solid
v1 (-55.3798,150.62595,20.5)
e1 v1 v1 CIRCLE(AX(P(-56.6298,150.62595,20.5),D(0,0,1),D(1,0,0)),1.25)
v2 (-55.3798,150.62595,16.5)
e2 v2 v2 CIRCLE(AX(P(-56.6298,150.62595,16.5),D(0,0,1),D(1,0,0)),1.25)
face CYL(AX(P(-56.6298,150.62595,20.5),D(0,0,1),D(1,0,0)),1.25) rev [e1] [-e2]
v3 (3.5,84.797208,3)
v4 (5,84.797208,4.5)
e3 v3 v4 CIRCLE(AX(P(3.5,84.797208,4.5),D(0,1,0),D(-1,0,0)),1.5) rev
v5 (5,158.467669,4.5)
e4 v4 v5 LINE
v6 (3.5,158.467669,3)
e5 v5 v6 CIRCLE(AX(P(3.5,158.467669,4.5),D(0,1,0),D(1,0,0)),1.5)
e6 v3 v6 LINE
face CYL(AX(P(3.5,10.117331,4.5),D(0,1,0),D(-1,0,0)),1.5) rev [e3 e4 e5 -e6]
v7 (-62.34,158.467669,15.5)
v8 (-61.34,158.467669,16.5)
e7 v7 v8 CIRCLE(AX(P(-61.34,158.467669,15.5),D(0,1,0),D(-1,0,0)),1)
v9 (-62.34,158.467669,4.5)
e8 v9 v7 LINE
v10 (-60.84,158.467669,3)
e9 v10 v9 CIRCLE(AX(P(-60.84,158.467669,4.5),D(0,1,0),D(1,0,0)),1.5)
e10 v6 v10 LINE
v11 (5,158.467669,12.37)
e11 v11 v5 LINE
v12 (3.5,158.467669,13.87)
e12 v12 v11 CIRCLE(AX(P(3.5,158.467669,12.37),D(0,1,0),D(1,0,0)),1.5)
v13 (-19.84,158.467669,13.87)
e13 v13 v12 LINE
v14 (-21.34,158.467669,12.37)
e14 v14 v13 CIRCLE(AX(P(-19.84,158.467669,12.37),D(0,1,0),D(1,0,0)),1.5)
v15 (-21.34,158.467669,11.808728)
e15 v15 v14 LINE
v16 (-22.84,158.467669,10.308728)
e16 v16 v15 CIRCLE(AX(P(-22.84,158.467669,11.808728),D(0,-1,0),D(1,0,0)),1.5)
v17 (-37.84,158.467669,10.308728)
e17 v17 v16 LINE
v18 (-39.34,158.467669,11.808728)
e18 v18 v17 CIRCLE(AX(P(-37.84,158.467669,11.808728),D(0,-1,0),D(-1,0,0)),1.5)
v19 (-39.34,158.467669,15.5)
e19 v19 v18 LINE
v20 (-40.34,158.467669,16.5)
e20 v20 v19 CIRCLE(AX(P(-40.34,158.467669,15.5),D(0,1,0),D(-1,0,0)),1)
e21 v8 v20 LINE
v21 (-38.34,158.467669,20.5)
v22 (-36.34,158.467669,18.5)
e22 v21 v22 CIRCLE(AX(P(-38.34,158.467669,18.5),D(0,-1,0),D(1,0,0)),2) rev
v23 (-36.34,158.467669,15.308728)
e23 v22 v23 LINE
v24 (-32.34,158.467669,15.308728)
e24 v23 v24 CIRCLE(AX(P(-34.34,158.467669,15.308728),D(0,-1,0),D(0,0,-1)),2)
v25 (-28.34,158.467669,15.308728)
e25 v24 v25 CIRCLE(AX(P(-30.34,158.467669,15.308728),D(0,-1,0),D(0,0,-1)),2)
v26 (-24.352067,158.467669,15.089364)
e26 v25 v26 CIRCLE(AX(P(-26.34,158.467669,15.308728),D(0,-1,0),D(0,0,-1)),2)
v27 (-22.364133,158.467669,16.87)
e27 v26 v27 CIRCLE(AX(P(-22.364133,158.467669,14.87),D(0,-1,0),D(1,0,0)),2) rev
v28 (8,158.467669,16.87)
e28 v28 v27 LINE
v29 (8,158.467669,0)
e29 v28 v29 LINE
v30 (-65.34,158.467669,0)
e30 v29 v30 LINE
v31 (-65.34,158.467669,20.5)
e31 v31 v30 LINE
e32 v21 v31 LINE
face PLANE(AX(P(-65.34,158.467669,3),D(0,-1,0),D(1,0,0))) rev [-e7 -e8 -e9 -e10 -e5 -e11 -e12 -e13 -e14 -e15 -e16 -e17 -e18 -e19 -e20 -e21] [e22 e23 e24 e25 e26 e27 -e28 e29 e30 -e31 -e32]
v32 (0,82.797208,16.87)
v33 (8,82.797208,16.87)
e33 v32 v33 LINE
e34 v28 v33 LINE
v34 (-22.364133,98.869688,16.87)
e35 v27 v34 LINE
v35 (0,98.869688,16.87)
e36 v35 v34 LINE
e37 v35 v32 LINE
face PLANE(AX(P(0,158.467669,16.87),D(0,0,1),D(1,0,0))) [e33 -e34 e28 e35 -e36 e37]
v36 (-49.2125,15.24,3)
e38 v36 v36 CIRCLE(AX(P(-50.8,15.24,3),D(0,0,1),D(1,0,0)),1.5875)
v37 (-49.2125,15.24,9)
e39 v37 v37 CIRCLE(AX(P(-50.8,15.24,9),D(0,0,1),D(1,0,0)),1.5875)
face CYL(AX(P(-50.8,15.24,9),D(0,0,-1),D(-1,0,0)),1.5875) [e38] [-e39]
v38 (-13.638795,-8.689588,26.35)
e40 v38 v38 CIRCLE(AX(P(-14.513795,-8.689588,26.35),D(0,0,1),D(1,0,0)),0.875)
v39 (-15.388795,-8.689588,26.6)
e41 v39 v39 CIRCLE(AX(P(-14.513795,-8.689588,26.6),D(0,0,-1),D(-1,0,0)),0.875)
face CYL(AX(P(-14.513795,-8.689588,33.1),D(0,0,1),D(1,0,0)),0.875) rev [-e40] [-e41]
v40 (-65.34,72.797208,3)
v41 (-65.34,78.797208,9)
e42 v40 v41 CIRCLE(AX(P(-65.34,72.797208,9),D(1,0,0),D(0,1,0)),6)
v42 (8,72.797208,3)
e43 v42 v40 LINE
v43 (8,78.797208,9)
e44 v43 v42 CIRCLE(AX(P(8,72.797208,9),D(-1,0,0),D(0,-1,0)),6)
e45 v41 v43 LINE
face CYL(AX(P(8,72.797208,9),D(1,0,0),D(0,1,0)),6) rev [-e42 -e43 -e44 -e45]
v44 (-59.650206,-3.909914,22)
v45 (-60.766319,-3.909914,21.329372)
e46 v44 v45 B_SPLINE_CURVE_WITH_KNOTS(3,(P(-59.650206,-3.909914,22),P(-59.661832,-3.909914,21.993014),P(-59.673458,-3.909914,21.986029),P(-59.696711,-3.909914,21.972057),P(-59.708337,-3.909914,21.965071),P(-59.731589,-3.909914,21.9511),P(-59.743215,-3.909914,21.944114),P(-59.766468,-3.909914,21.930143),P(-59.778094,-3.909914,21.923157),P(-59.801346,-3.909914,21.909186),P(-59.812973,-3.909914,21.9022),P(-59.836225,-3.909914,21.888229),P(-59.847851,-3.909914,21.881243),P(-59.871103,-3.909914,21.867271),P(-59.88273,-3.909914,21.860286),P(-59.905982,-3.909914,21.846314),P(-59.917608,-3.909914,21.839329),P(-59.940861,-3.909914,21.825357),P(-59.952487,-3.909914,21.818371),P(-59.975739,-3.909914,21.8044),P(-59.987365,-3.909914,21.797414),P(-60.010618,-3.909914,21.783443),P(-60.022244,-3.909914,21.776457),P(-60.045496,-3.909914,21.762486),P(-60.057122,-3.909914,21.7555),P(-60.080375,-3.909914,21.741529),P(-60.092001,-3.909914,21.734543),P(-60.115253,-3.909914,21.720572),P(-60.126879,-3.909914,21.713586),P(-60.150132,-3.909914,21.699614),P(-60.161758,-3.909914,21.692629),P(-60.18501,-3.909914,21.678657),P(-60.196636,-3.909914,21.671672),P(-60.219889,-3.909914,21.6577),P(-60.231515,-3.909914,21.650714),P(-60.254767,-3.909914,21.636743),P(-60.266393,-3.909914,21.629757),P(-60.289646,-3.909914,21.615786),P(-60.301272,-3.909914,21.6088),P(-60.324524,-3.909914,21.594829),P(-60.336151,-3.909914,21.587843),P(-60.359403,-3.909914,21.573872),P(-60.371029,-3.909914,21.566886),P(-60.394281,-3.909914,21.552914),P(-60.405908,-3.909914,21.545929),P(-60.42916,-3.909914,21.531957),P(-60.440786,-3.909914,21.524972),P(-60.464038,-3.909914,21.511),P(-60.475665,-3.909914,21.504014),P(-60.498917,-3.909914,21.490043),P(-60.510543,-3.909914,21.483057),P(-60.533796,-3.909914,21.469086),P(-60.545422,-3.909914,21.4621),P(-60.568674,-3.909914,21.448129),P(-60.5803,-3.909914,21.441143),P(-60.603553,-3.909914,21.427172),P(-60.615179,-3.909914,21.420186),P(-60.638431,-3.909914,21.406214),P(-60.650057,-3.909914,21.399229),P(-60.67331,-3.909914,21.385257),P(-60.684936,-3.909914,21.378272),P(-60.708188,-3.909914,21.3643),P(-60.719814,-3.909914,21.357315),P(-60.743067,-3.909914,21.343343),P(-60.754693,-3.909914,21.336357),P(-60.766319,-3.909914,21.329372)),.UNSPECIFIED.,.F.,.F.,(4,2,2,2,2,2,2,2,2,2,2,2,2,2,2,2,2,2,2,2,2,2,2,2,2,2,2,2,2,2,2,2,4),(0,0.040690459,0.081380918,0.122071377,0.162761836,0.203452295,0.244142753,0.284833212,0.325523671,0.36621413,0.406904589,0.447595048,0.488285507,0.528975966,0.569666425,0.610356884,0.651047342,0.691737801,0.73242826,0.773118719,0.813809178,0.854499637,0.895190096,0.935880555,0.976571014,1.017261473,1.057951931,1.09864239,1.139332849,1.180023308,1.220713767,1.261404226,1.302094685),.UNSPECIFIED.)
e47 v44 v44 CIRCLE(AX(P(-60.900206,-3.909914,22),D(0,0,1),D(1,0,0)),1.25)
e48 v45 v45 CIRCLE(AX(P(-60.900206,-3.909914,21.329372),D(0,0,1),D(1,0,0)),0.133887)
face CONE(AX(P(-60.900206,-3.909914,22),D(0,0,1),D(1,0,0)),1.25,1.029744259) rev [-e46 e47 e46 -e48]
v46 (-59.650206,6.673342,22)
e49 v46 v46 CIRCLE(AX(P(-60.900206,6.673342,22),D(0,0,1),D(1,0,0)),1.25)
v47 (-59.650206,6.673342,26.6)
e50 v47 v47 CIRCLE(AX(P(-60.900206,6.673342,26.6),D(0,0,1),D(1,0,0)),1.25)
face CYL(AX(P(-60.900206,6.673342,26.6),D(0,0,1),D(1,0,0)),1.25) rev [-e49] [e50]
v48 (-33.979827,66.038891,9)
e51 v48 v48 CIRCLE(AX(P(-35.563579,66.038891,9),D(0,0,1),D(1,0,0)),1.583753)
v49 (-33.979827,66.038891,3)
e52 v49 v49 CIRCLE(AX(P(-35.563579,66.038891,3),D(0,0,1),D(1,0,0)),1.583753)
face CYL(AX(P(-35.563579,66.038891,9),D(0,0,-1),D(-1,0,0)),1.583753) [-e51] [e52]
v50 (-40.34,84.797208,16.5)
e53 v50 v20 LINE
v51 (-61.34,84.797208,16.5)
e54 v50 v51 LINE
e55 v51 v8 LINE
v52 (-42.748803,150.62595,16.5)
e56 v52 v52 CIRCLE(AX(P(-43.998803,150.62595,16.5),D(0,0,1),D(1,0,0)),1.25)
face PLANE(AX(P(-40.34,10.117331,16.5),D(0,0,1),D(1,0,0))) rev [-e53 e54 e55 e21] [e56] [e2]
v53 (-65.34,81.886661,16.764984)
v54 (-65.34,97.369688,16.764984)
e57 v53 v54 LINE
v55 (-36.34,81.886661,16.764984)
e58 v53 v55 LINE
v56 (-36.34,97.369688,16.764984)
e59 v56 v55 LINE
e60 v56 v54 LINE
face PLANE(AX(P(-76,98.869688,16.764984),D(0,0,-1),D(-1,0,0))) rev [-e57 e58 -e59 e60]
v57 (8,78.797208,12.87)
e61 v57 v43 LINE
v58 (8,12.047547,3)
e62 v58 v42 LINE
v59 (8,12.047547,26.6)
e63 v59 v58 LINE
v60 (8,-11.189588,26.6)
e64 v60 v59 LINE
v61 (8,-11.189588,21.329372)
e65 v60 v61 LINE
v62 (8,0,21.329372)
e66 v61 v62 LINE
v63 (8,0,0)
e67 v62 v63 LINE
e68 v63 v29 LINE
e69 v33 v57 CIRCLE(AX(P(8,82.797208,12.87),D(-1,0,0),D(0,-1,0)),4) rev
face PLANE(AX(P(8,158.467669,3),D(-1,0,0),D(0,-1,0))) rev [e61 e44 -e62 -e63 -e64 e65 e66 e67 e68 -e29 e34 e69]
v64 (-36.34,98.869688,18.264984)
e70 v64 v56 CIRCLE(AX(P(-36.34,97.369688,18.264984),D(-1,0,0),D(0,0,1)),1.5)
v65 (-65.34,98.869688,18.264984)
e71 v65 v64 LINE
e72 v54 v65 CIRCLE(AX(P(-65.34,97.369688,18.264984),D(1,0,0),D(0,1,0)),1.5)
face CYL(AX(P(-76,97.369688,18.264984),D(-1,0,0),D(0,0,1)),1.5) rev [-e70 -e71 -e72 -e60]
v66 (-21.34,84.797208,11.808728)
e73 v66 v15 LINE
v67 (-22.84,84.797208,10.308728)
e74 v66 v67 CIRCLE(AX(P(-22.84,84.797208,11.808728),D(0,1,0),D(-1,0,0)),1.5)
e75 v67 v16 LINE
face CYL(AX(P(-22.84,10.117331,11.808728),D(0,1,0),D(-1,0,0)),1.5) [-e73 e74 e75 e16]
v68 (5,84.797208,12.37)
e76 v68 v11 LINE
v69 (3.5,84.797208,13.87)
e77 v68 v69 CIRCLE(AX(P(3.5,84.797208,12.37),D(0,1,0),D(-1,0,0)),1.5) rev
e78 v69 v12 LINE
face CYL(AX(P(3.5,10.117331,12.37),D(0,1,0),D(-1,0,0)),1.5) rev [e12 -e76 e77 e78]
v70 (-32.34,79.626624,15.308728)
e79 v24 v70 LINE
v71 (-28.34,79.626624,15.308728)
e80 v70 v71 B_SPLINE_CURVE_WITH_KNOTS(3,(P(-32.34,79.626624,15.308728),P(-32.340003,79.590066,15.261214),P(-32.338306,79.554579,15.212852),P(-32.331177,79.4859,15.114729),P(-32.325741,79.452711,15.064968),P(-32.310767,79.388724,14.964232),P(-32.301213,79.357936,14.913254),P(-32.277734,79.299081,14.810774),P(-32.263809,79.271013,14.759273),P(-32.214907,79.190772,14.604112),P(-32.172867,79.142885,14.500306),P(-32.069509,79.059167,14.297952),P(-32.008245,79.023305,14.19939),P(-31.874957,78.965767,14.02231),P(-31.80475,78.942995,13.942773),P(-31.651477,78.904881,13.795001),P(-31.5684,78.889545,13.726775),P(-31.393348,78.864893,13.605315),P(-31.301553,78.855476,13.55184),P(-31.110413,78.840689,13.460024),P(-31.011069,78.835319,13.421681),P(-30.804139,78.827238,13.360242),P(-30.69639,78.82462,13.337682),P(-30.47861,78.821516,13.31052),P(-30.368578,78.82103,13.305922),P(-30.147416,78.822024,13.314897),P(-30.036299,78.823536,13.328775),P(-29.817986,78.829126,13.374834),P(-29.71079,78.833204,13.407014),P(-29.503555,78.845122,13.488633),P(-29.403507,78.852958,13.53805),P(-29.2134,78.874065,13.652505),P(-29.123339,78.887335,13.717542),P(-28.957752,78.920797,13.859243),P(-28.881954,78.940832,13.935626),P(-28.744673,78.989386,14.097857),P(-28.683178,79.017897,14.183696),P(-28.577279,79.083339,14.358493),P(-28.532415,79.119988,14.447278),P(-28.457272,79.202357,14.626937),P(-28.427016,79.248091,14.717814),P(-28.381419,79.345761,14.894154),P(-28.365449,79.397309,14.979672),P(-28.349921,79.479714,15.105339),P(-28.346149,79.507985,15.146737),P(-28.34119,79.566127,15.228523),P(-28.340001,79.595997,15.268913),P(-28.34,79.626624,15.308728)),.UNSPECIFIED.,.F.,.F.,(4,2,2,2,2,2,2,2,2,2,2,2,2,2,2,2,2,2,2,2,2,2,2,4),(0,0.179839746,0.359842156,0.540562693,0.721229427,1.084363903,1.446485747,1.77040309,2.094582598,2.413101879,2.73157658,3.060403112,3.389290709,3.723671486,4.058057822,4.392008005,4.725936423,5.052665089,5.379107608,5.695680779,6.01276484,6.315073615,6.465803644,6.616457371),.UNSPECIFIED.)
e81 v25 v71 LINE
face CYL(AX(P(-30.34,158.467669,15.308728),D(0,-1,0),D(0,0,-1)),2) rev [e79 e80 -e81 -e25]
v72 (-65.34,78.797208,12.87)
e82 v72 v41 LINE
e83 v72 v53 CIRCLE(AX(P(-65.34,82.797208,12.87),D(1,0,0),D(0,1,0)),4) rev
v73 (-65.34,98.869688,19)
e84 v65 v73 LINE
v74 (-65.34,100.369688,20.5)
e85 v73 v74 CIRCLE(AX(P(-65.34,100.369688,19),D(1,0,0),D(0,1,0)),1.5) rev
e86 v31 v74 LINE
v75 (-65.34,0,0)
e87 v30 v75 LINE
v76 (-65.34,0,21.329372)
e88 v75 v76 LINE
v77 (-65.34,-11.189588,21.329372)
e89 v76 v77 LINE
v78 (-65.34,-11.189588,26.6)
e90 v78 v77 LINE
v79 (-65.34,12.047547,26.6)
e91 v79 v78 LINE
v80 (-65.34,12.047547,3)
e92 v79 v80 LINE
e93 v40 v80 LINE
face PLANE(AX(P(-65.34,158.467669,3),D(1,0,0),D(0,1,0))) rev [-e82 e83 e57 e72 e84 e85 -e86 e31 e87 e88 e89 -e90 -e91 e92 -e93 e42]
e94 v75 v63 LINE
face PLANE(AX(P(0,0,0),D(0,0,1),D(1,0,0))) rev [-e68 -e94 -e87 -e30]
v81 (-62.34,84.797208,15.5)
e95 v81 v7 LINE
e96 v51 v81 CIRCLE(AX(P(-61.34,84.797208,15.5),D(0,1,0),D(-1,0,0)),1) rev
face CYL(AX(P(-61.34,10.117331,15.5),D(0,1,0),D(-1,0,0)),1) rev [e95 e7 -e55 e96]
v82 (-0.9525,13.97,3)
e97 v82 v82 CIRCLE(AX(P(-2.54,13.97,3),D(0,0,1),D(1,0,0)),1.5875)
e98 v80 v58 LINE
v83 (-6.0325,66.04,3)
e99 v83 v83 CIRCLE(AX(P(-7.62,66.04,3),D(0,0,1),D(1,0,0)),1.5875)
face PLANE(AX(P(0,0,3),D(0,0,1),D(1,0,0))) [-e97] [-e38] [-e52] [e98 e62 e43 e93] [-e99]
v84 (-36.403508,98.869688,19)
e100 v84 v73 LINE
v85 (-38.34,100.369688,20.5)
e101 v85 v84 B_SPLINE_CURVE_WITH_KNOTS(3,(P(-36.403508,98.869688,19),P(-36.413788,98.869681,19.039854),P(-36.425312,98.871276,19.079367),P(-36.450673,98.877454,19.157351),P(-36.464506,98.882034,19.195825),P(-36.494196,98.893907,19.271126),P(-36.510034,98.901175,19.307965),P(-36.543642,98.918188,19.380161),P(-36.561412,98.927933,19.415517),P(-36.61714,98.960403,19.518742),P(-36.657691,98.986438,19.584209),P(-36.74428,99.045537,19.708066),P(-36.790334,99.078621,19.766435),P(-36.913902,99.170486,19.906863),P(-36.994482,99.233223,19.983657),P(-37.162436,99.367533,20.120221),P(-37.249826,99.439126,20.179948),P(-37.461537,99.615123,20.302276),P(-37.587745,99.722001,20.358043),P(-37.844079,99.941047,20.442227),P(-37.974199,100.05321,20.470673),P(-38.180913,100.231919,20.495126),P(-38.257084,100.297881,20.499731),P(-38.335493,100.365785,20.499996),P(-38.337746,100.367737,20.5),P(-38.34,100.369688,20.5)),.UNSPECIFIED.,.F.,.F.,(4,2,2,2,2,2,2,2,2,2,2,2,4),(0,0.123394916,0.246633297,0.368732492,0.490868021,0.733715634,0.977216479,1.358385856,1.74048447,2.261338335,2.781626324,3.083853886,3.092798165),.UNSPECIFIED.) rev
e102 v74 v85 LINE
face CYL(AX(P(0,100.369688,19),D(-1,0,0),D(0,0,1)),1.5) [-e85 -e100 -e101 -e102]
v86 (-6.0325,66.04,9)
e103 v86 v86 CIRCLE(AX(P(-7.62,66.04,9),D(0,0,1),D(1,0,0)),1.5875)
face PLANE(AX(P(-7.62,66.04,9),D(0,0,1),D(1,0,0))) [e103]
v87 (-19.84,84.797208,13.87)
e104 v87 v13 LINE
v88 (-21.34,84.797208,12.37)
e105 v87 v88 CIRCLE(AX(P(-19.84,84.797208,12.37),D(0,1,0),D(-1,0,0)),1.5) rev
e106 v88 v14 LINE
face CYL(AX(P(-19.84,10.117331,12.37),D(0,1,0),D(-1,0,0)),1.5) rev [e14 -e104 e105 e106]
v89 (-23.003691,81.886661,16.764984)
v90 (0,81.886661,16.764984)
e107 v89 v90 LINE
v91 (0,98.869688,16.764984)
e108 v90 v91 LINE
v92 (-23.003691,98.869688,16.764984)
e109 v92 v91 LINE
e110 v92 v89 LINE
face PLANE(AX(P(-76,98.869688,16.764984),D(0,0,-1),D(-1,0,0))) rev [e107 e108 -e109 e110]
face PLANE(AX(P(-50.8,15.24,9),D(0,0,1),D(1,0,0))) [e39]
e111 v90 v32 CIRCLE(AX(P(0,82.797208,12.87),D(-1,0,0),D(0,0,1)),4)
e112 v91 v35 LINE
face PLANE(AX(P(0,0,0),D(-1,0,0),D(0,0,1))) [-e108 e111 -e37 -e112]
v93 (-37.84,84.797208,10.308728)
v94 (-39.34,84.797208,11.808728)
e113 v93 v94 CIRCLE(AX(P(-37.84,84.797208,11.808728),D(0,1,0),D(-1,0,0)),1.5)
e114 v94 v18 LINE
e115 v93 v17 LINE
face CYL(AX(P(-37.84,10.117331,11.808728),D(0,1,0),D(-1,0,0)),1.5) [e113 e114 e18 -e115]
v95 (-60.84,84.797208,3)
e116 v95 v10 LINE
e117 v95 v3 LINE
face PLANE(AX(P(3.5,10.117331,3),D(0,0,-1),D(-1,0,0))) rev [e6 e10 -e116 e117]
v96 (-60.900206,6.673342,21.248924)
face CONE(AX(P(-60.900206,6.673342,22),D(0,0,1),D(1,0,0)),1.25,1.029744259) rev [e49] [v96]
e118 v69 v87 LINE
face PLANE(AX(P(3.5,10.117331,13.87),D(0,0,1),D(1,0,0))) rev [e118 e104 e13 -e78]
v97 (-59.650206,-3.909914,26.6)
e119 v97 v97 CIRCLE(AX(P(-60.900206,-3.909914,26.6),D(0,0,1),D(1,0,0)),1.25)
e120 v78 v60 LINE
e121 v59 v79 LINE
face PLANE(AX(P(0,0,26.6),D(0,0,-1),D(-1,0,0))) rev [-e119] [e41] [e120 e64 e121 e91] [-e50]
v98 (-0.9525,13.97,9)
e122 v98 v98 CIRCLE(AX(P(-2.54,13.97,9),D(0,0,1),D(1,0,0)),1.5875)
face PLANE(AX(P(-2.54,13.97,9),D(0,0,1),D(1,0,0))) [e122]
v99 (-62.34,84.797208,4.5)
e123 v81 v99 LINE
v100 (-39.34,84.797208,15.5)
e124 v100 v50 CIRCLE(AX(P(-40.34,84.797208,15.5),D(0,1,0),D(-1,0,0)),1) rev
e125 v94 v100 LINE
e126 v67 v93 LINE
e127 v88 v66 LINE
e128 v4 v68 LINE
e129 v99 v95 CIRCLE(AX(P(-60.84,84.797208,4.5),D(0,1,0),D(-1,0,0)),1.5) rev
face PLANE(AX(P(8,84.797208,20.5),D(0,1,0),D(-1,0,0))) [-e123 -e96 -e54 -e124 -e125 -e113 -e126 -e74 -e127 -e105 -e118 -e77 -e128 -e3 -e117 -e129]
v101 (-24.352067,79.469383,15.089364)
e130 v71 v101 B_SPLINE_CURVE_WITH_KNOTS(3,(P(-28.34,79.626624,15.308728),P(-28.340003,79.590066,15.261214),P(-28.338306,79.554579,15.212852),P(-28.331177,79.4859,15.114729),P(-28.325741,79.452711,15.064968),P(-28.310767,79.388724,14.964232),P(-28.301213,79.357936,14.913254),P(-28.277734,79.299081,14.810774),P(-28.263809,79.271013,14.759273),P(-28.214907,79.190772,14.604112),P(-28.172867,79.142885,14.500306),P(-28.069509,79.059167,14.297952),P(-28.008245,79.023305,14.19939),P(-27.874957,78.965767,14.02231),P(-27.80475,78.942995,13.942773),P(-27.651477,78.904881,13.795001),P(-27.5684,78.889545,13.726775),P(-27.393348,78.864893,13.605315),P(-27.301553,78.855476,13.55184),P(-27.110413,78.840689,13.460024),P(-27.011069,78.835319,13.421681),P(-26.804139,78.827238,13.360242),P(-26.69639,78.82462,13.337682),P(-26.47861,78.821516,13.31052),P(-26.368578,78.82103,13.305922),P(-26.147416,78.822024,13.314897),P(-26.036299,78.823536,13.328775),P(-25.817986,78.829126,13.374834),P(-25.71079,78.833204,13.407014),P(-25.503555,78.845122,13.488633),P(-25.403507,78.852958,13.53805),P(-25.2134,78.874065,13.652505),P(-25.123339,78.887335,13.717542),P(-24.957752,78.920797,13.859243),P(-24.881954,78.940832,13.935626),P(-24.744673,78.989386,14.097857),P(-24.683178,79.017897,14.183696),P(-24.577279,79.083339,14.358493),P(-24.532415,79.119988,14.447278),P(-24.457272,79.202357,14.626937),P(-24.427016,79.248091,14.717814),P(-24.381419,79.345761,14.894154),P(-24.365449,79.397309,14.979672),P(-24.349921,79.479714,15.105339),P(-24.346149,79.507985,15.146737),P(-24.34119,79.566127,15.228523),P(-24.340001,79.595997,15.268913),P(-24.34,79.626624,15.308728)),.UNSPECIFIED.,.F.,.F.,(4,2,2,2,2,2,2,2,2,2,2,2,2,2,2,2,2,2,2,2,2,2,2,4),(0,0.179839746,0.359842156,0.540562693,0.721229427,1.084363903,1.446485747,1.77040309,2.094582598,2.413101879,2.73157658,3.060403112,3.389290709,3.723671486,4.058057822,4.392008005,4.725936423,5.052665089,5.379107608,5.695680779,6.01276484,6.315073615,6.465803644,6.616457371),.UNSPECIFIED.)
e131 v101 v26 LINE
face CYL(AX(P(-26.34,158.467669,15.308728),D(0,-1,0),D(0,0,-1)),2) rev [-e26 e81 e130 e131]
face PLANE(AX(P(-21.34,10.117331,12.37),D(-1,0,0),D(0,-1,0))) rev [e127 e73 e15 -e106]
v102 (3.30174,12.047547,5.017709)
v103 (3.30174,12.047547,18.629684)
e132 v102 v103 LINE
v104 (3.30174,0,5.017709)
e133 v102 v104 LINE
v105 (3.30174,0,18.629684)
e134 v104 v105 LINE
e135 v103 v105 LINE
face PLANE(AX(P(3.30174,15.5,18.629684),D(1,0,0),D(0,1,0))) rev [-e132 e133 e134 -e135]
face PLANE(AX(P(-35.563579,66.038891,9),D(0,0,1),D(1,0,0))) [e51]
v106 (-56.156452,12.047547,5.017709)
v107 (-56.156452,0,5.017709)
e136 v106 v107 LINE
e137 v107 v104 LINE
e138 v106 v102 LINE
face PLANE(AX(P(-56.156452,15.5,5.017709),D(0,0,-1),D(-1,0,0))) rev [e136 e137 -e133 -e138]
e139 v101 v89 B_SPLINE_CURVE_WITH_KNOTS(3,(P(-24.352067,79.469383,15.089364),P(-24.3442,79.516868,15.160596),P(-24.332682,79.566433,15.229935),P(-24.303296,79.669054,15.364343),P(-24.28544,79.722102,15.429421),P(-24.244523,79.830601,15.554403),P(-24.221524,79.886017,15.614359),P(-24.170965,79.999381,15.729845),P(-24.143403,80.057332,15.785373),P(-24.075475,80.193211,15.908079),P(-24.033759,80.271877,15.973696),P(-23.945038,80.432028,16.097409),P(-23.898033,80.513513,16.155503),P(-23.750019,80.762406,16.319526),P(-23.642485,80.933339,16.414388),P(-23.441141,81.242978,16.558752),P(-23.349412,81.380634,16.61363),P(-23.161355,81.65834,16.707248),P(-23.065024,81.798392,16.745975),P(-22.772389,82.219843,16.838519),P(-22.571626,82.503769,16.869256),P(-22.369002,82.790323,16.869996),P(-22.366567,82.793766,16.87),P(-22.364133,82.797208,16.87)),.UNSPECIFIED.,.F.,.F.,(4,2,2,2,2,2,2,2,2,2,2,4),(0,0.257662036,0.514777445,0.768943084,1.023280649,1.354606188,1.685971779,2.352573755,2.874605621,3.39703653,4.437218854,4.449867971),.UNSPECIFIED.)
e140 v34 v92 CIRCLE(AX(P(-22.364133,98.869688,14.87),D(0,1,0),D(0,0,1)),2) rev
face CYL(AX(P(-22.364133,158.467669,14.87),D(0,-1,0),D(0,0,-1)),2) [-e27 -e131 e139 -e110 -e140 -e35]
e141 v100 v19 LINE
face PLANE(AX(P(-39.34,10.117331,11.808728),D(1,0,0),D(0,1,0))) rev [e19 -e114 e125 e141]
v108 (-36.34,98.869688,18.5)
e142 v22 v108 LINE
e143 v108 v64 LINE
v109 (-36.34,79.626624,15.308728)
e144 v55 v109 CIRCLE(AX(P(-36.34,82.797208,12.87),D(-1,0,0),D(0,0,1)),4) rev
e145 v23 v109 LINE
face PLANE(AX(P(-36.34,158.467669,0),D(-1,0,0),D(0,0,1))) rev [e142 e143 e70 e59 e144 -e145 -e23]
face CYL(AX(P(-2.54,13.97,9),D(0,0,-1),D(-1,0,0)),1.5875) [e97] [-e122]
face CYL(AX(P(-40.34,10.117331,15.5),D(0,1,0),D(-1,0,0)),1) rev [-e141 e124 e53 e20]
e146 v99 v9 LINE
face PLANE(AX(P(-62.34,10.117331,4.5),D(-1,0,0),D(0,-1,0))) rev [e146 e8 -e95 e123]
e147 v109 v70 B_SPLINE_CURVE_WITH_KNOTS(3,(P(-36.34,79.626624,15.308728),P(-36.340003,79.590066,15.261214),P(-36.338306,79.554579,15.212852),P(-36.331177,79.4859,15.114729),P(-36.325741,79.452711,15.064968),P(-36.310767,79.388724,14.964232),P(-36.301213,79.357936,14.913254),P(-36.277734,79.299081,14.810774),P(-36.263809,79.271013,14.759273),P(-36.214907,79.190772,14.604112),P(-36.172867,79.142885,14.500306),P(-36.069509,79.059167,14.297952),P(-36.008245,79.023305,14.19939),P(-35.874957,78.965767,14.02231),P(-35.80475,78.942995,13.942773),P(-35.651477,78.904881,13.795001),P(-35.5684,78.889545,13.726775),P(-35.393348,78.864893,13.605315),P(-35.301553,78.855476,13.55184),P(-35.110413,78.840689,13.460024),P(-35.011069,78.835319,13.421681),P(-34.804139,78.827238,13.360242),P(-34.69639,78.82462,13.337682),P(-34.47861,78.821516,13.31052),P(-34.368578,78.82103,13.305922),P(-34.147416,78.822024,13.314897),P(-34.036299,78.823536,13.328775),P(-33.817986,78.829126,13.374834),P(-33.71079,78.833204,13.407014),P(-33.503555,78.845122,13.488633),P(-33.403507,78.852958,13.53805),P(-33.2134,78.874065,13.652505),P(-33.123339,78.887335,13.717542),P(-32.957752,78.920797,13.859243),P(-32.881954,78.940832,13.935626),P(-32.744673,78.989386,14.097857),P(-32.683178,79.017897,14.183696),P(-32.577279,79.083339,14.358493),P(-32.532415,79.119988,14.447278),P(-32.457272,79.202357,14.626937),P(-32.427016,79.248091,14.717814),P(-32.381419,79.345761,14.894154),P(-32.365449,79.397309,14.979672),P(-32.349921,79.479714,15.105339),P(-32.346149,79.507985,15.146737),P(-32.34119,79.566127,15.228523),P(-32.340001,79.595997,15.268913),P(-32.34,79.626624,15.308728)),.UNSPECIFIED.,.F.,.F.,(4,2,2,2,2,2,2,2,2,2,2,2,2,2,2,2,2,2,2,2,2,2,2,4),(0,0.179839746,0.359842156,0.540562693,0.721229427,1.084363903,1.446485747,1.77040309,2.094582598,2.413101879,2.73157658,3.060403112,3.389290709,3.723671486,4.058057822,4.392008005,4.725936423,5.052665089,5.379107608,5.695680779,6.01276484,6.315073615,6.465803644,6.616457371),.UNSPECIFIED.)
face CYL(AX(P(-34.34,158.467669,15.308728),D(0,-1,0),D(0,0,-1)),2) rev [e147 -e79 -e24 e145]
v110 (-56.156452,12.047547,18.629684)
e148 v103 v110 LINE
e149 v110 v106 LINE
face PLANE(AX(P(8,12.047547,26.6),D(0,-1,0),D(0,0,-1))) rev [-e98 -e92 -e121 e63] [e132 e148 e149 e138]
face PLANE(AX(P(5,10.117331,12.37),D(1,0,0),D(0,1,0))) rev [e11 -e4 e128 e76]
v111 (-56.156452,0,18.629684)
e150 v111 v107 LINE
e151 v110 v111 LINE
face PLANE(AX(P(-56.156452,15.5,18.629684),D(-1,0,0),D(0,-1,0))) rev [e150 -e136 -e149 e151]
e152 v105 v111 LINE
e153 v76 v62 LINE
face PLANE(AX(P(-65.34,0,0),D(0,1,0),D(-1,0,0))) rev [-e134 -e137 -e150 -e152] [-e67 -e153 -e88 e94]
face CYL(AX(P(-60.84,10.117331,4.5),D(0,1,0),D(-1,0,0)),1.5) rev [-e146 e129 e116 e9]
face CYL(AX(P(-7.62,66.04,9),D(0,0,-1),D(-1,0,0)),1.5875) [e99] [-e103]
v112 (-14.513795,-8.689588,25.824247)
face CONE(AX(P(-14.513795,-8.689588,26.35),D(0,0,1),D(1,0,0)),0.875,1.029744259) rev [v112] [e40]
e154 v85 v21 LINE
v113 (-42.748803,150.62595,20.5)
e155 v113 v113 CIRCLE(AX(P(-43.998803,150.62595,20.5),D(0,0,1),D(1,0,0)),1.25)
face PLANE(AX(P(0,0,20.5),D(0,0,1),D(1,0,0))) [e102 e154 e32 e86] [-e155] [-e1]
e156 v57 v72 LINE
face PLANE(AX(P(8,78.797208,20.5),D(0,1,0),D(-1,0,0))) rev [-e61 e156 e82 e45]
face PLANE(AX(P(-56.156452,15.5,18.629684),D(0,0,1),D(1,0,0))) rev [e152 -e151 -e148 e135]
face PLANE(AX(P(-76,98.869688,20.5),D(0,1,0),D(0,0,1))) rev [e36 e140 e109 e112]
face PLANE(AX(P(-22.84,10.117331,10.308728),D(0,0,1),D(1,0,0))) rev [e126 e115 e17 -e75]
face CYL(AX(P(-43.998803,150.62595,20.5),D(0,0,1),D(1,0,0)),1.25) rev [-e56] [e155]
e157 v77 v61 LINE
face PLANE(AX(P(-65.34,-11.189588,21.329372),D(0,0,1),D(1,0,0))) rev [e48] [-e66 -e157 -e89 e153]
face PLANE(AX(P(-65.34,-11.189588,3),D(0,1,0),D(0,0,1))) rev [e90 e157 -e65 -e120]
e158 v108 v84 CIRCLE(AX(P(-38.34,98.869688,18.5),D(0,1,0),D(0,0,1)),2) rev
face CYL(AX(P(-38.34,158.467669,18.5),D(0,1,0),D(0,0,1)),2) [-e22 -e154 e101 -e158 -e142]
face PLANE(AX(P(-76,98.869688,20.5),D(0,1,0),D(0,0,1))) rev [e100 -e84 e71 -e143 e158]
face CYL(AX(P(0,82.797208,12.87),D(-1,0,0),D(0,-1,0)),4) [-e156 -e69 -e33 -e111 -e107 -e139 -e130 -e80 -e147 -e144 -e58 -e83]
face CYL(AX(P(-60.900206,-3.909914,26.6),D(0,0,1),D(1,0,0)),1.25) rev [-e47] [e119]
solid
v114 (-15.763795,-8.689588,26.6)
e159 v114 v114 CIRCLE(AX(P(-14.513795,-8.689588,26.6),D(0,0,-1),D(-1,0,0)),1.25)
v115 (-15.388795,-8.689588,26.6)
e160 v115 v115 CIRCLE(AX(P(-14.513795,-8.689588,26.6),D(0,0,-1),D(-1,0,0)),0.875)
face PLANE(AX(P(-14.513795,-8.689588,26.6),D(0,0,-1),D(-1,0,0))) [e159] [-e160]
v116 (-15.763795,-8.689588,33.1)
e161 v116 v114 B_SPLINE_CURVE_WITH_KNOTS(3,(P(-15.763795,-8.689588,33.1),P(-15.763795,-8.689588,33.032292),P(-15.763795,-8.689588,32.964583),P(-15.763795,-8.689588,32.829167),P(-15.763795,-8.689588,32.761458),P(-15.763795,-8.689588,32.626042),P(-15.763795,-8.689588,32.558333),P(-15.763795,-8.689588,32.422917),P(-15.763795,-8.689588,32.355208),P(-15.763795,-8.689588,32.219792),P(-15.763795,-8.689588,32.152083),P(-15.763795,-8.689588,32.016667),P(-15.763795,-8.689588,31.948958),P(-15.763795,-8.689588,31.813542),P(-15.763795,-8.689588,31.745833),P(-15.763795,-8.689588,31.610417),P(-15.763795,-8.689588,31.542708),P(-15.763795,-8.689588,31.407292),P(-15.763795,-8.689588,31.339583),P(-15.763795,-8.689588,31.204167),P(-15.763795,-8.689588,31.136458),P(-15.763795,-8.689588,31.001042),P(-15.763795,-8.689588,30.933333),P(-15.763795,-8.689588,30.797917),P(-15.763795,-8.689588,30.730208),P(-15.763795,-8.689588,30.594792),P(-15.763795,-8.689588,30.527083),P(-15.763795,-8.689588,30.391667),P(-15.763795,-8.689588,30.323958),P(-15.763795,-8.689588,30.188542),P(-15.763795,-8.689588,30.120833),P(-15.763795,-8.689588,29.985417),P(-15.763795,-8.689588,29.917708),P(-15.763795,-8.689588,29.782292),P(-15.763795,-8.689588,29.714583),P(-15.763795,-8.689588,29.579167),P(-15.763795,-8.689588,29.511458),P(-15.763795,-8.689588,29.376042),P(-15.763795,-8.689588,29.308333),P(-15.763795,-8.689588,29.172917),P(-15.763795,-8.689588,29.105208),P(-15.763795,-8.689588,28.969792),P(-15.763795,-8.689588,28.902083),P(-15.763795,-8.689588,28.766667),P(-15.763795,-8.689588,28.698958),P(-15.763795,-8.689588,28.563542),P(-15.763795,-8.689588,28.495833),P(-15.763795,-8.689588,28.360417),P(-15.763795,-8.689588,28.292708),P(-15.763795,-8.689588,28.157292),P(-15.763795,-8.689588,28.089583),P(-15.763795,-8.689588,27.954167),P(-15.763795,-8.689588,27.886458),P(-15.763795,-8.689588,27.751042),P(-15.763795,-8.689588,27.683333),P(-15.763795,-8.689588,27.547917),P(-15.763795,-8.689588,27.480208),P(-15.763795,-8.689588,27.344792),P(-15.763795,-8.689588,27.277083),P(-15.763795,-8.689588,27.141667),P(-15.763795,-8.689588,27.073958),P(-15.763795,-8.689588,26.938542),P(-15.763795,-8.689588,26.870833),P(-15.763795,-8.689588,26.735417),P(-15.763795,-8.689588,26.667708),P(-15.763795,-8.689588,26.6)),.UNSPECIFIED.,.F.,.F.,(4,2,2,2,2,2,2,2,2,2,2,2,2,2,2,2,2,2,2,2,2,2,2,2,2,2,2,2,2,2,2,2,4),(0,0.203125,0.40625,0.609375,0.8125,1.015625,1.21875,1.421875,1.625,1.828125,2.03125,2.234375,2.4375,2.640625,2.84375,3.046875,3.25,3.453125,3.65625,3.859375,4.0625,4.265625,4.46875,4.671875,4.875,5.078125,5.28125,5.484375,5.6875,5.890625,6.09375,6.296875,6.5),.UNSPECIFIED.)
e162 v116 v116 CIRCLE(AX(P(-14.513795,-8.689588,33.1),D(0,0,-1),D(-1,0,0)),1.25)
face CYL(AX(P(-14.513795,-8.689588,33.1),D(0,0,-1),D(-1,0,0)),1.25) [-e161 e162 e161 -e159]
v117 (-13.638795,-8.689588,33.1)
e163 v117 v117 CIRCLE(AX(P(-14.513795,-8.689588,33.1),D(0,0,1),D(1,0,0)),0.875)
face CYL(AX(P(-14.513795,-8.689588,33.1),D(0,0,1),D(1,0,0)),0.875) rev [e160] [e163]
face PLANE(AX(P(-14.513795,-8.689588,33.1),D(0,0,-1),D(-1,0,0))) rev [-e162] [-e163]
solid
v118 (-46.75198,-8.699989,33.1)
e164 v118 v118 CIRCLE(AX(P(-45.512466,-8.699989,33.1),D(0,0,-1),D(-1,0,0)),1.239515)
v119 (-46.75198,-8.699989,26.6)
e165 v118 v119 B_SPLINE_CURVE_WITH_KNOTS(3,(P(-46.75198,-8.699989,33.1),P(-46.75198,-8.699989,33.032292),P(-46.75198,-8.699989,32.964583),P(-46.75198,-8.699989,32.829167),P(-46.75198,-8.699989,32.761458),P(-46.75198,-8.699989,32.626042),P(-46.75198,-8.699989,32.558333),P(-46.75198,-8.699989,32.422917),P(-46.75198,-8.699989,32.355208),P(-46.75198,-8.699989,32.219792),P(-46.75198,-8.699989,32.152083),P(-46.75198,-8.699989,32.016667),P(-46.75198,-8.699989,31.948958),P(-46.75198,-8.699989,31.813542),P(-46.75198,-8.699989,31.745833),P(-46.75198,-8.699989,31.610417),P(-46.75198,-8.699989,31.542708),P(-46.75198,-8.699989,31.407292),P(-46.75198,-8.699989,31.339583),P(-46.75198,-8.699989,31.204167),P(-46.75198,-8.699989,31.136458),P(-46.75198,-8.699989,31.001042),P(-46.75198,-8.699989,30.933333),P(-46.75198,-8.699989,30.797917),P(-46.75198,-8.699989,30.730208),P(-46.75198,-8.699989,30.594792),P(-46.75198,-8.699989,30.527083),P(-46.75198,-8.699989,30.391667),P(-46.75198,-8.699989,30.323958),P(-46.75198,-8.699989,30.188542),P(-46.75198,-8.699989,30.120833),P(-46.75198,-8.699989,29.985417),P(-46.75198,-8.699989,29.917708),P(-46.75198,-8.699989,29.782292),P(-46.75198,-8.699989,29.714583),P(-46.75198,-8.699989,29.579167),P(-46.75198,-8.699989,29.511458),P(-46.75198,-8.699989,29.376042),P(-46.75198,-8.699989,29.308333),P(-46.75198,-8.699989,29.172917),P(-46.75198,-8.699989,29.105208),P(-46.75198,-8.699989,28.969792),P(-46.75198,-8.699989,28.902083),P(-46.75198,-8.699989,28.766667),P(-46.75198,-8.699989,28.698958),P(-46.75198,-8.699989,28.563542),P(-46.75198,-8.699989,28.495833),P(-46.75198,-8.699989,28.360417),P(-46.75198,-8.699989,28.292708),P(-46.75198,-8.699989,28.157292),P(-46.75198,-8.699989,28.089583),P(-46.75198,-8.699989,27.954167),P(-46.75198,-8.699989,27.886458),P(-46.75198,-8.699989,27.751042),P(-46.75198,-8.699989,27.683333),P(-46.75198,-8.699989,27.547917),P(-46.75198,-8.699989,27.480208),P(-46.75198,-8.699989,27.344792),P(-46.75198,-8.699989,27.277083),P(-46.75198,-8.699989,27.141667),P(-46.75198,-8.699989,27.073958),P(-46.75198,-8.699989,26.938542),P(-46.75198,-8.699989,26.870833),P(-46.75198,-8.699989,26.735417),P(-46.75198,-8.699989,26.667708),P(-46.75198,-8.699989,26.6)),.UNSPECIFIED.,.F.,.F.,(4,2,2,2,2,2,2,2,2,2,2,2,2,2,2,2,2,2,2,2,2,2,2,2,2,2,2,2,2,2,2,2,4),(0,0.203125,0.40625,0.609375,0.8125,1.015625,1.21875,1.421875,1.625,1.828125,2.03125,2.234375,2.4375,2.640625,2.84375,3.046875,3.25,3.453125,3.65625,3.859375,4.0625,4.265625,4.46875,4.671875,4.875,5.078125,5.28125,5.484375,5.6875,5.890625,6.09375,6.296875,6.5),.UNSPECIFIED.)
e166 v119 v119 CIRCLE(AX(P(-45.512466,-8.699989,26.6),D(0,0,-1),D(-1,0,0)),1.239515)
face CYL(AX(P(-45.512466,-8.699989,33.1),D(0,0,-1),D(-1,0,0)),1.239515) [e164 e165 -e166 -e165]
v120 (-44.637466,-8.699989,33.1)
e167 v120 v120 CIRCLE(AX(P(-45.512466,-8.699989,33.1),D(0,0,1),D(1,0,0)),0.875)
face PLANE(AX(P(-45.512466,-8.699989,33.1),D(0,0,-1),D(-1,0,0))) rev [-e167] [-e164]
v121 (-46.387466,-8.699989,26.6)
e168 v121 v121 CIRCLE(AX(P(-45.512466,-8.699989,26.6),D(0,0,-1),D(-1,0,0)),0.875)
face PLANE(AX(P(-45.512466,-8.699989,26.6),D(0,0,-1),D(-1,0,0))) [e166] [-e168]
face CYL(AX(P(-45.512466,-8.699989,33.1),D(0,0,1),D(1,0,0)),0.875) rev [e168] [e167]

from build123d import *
from OCP.BRepAlgoAPI import BRepAlgoAPI_Cut
from OCP.TopTools import TopTools_ListOfShape

# Parameters (mm, degrees)
SKETCH1_W                      = 73.34
SKETCH1_H                      = 169.657257597
BOSS_EXTRUDE1_DEPTH            = 3
SKETCH9_W                      = 73.34
SKETCH9_H                      = 79.670461067
BOSS_EXTRUDE4_DEPTH            = 17.5
CUT_EXTRUDE1_DEPTH             = 173.631306068
CUT_EXTRUDE2_DEPTH             = 73.670461067
SKETCH12_W                     = 20.775343783
SKETCH12_H                     = 3.735015603
CUT_EXTRUDE3_DEPTH             = 76
FILLET1_START                  = -66
FILLET1_DEPTH                  = 75
FILLET1_START_2                = -65.34
FILLET1_2_DEPTH                = 29
FILLET1_3_DEPTH                = 75
FILLET1_4_DEPTH                = 73.34
FILLET1_START_3                = 79.469382503
FILLET1_5_DEPTH                = 79.530617497
SKETCH13_W                     = 73.34
SKETCH13_H                     = 23.237135262
BOSS_EXTRUDE5_DEPTH            = 26.6
CUT_EXTRUDE4_DEPTH             = 177.630455701
CUT_EXTRUDE4_DEPTH_BACK        = 177.630455701
SKETCH14_W                     = 21.32937166
SKETCH14_H                     = 11.18958823
SKETCH18_W                     = 59.458192731
SKETCH18_H                     = 13.611975131
CUT_EXTRUDE5_DEPTH             = 15.5
BOSS_EXTRUDE6_START            = -8.965684
SKETCH20_R                     = 1.23951459
BOSS_EXTRUDE6_DEPTH            = 6.5
SKETCH20_R_2                   = 1.25
BOSS_EXTRUDE6_2_DEPTH          = 6.5
SKETCH2_R                      = 1.5875
SKETCH2_R_2                    = 1.58375263
BOSS_EXTRUDE7_DEPTH            = 6
M3X0_5_TAPPED_HOLE1_AT_2_COUNT = 2
M3X0_5_TAPPED_HOLE1_AT_2_PITCH = 10.583256094
M3X0_5_TAPPED_HOLE2_AT_2_COUNT = 2
M3X0_5_TAPPED_HOLE2_AT_2_PITCH = 12.630996486


with BuildPart() as part:
    # Sketch1 → Boss-Extrude1 (new body)
    with BuildSketch(Plane.XY):
        with Locations((-28.67, 73.639040569)):
            Rectangle(SKETCH1_W, SKETCH1_H)
    extrude(amount=BOSS_EXTRUDE1_DEPTH)

    # Sketch9 → Boss-Extrude4 (add)
    with BuildSketch(Plane.XY.offset(3)):
        with Locations((-28.67, 118.632438834)):
            Rectangle(SKETCH9_W, SKETCH9_H)
    extrude(amount=BOSS_EXTRUDE4_DEPTH)

    # Sketch10 → Cut-Extrude1 (cut, through all)
    with BuildSketch(Plane.XZ):
        with BuildLine():
            ThreePointArc((-32.34, 15.308727806), (-30.34, 13.308727806), (-28.34, 15.308727806))
            ThreePointArc((-28.34, 15.308727806), (-26.34, 13.308727806), (-24.34, 15.308727806))
            Line((-24.34, 15.308727806), (-24.34, 16.87))
            Line((-24.34, 16.87), (8, 16.87))
            Line((8, 16.87), (8, 20.5))
            Line((8, 20.5), (-36.34, 20.5))
            Line((-36.34, 20.5), (-36.34, 16.87))
            Line((-36.34, 16.87), (-36.34, 15.308727806))
            ThreePointArc((-36.34, 15.308727806), (-34.34, 13.308727806), (-32.34, 15.308727806))
        make_face()
    extrude(amount=-CUT_EXTRUDE1_DEPTH, mode=Mode.SUBTRACT)

    # Sketch11 → Cut-Extrude2 (cut)
    with BuildSketch(Plane(origin=(0, 158.467669367, 0), x_dir=(1, 0, 0), z_dir=(0, 1, 0))):
        with BuildLine():
            Line((-39.34, -3), (-60.84, -3))
            ThreePointArc((-60.84, -3), (-61.900660172, -3.439339828), (-62.34, -4.5))
            Line((-62.34, -4.5), (-62.34, -15.5))
            ThreePointArc((-62.34, -15.5), (-62.047106781, -16.207106781), (-61.34, -16.5))
            Line((-61.34, -16.5), (-40.34, -16.5))
            ThreePointArc((-40.34, -16.5), (-39.632893219, -16.207106781), (-39.34, -15.5))
            Line((-39.34, -15.5), (-39.34, -11.808727806))
            ThreePointArc((-39.34, -11.808727806), (-38.900660172, -10.748067634), (-37.84, -10.308727806))
            Line((-37.84, -10.308727806), (-22.84, -10.308727806))
            ThreePointArc((-22.84, -10.308727806), (-21.779339828, -10.748067634), (-21.34, -11.808727806))
            Line((-21.34, -11.808727806), (-21.34, -12.37))
            ThreePointArc((-21.34, -12.37), (-20.900660172, -13.430660172), (-19.84, -13.87))
            Line((-19.84, -13.87), (3.5, -13.87))
            ThreePointArc((3.5, -13.87), (4.560660172, -13.430660172), (5, -12.37))
            Line((5, -12.37), (5, -4.5))
            ThreePointArc((5, -4.5), (4.560660172, -3.439339828), (3.5, -3))
            Line((3.5, -3), (-21.34, -3))
            Line((-21.34, -3), (-39.34, -3))
        make_face()
    extrude(amount=-CUT_EXTRUDE2_DEPTH, mode=Mode.SUBTRACT)

    # Sketch12 → Cut-Extrude3 (cut)
    with BuildSketch(Plane.YZ):
        with Locations((88.482016522, 18.632492199)):
            Rectangle(SKETCH12_W, SKETCH12_H)
    extrude(amount=-CUT_EXTRUDE3_DEPTH, mode=Mode.SUBTRACT)

    # Fillet1: read off the stored shape, not the designer's step
    # Fillet1 outline → Fillet1 (cut)
    with BuildSketch(Plane.YZ.offset(FILLET1_START)):
        with BuildLine():
            Line((78.7972083, 16.764984397), (78.7972083, 12.87))
            ThreePointArc((78.7972083, 12.87), (79.663345702, 15.355740377), (81.886660911, 16.764984397))
            Line((81.886660911, 16.764984397), (78.7972083, 16.764984397))
        make_face()
    extrude(amount=FILLET1_DEPTH, mode=Mode.SUBTRACT)

    # Fillet1 2 outline → Fillet1 2 (add)
    with BuildSketch(Plane.YZ.offset(FILLET1_START_2)):
        with BuildLine():
            ThreePointArc((98.869688413, 18.264984397), (98.430348584, 17.204324226), (97.369688413, 16.764984397))
            Line((97.369688413, 16.764984397), (98.869688413, 16.764984397))
            Line((98.869688413, 16.764984397), (98.869688413, 18.264984397))
        make_face()
    extrude(amount=FILLET1_2_DEPTH)

    # Fillet1 3 outline → Fillet1 3 (cut)
    with BuildSketch(Plane.YZ.offset(FILLET1_START)):
        with BuildLine():
            ThreePointArc((98.869688413, 19), (99.309028241, 20.060660172), (100.369688413, 20.5))
            Line((100.369688413, 20.5), (98.869688413, 20.5))
            Line((98.869688413, 20.5), (98.869688413, 19))
        make_face()
        with BuildLine():
            Line((78.7972083, 16.764984397), (81.886660911, 16.764984397))
            ThreePointArc((81.886660911, 16.764984397), (82.338916683, 16.843659371), (82.7972083, 16.87))
            Line((82.7972083, 16.87), (78.7972083, 16.87))
            Line((78.7972083, 16.87), (78.7972083, 16.764984397))
        make_face()
    extrude(amount=FILLET1_3_DEPTH, mode=Mode.SUBTRACT)

    # Fillet1 4 outline → Fillet1 4 (add)
    with BuildSketch(Plane.YZ.offset(FILLET1_START_2)):
        with BuildLine():
            Line((78.7972083, 3), (78.7972083, 9))
            ThreePointArc((78.7972083, 9), (77.039848987, 4.757359313), (72.7972083, 3))
            Line((72.7972083, 3), (78.7972083, 3))
        make_face()
    extrude(amount=FILLET1_4_DEPTH)

    # Fillet1 5 outline → Fillet1 5 (cut)
    with BuildSketch(Plane(origin=(0, 0, 0), x_dir=(1, 0, 0), z_dir=(0, 1, 0)).offset(FILLET1_START_3)):
        with BuildLine():
            Line((-24.34, -16.87), (-22.364133062, -16.87))
            ThreePointArc((-22.364133062, -16.87), (-23.698537771, -16.359753024), (-24.352066512, -15.089364072))
            ThreePointArc((-24.352066512, -15.089364072), (-24.343018906, -15.198880129), (-24.34, -15.308727806))
            Line((-24.34, -15.308727806), (-24.34, -16.87))
        make_face()
        with BuildLine():
            ThreePointArc((-36.34, -18.5), (-36.925786438, -19.914213562), (-38.34, -20.5))
            Line((-38.34, -20.5), (-36.34, -20.5))
            Line((-36.34, -20.5), (-36.34, -18.5))
        make_face()
    extrude(amount=FILLET1_5_DEPTH, mode=Mode.SUBTRACT)

    # Sketch13 → Boss-Extrude5 (add)
    with BuildSketch(Plane.XY):
        with Locations((-28.67, 0.428979401)):
            Rectangle(SKETCH13_W, SKETCH13_H)
    extrude(amount=BOSS_EXTRUDE5_DEPTH)

    # Sketch14 → Cut-Extrude4 (cut, two sides: drawn at the far end of the back side and taken through both)
    with BuildSketch(Plane(origin=(8, 0, 0), x_dir=(0, 0, -1), z_dir=(1, 0, 0)).offset(-CUT_EXTRUDE4_DEPTH_BACK)):
        with Locations((-10.66468583, -5.594794115)):
            Rectangle(SKETCH14_W, SKETCH14_H)
    extrude(amount=CUT_EXTRUDE4_DEPTH + CUT_EXTRUDE4_DEPTH_BACK, mode=Mode.SUBTRACT)

    # Sketch18 → Cut-Extrude5 (cut)
    with BuildSketch(Plane(origin=(0, 0, 0), x_dir=(-1, 0, 0), z_dir=(0, -1, 0))):
        with Locations((26.427356062, -11.823696784)):
            Rectangle(SKETCH18_W, SKETCH18_H)
    extrude(amount=-CUT_EXTRUDE5_DEPTH, mode=Mode.SUBTRACT)


with BuildPart() as body_2:
    # Sketch20 → Boss-Extrude6 (new body)
    with BuildSketch(Plane.XY.offset(35.565684349).offset(BOSS_EXTRUDE6_START)):
        with Locations(Location((-45.512465678, -8.699989093, 0), (0, 0, 180))):
            Circle(SKETCH20_R)
    extrude(amount=BOSS_EXTRUDE6_DEPTH)


with BuildPart() as body_3:
    # Sketch20 → Boss-Extrude6 2 (new body)
    with BuildSketch(Plane.XY.offset(35.565684349).offset(BOSS_EXTRUDE6_START)):
        with Locations(Location((-14.513794536, -8.68958823, 0), (0, 0, 180))):
            Circle(SKETCH20_R_2)
    extrude(amount=BOSS_EXTRUDE6_2_DEPTH)


with BuildPart() as m2_2x0_45_tapped_hole1_tool:
    # Sketch24 → M2.2x0.45 Tapped Hole1 (revolve)
    with BuildSketch(Plane(origin=(-45.512465678, -8.699989093, 33.1), x_dir=(0, -1, 0), z_dir=(1, 0, 0))):
        Polygon((0, 0), (0, 7.275753042), (0.875, 6.75), (0.875, 0), align=None)
    revolve(axis=Axis((-45.512465678, -8.699989093, 39.45), (0, 0, -1)))


with BuildPart() as body_2_1:
    add(body_2.part)

    # M2.2x0.45 Tapped Hole1: cut by m2_2x0_45_tapped_hole1_tool, with a tolerance
    m2_2x0_45_tapped_hole1_stock = TopTools_ListOfShape()
    m2_2x0_45_tapped_hole1_stock.Append(body_2_1.part.wrapped)
    m2_2x0_45_tapped_hole1_tools = TopTools_ListOfShape()
    m2_2x0_45_tapped_hole1_tools.Append(m2_2x0_45_tapped_hole1_tool.part.wrapped)
    m2_2x0_45_tapped_hole1_cut = BRepAlgoAPI_Cut()
    m2_2x0_45_tapped_hole1_cut.SetArguments(m2_2x0_45_tapped_hole1_stock)
    m2_2x0_45_tapped_hole1_cut.SetTools(m2_2x0_45_tapped_hole1_tools)
    m2_2x0_45_tapped_hole1_cut.SetFuzzyValue(0.00001)
    m2_2x0_45_tapped_hole1_cut.Build()
    add(Compound.cast(m2_2x0_45_tapped_hole1_cut.Shape()).solids(), mode=Mode.REPLACE)


with BuildPart() as m2_2x0_45_tapped_hole2_tool:
    # Sketch27 → M2.2x0.45 Tapped Hole2 (revolve)
    with BuildSketch(Plane(origin=(-14.513794536, -8.68958823, 33.1), x_dir=(0, -1, 0), z_dir=(1, 0, 0))):
        Polygon((0, 0), (0, 7.275753042), (0.875, 6.75), (0.875, 0), align=None)
    revolve(axis=Axis((-14.513794536, -8.68958823, 39.45), (0, 0, -1)))


with BuildPart() as part_1:
    add(part.part)

    # M2.2x0.45 Tapped Hole2: cut by m2_2x0_45_tapped_hole2_tool, with a tolerance
    m2_2x0_45_tapped_hole2_stock = TopTools_ListOfShape()
    m2_2x0_45_tapped_hole2_stock.Append(part_1.part.wrapped)
    m2_2x0_45_tapped_hole2_tools = TopTools_ListOfShape()
    m2_2x0_45_tapped_hole2_tools.Append(m2_2x0_45_tapped_hole2_tool.part.wrapped)
    m2_2x0_45_tapped_hole2_cut = BRepAlgoAPI_Cut()
    m2_2x0_45_tapped_hole2_cut.SetArguments(m2_2x0_45_tapped_hole2_stock)
    m2_2x0_45_tapped_hole2_cut.SetTools(m2_2x0_45_tapped_hole2_tools)
    m2_2x0_45_tapped_hole2_cut.SetFuzzyValue(0.00001)
    m2_2x0_45_tapped_hole2_cut.Build()
    add(Compound.cast(m2_2x0_45_tapped_hole2_cut.Shape()).solids(), mode=Mode.REPLACE)

    # Sketch2 → Boss-Extrude7 (add)
    with BuildSketch(Plane.XY.offset(3)):
        with Locations((-2.54, 13.97)):
            Circle(SKETCH2_R)
        with Locations((-35.563579412, 66.03889068)):
            Circle(SKETCH2_R_2)
        with Locations((-50.8, 15.24)):
            Circle(SKETCH2_R)
        with Locations((-7.62, 66.04)):
            Circle(SKETCH2_R)
    extrude(amount=BOSS_EXTRUDE7_DEPTH)

    # Sketch29 → M3x0.5 Tapped Hole1 (revolve, cut)
    with BuildSketch(Plane(origin=(-60.900206077, 6.673342436, 26.6), x_dir=(0, -1, 0), z_dir=(1, 0, 0))):
        Polygon((0, 0), (0, 5.351075774), (1.25, 4.6), (1.25, 0), align=None)
    m3x0_5_tapped_hole1 = revolve(axis=Axis((-60.900206077, 6.673342436, 32.95), (0, 0, -1)), mode=Mode.SUBTRACT)

    # M3x0.5 Tapped Hole1 at 2: M3x0.5 Tapped Hole1 ×2
    with Locations(*[(0, -i * M3X0_5_TAPPED_HOLE1_AT_2_PITCH, 0) for i in range(1, M3X0_5_TAPPED_HOLE1_AT_2_COUNT)]):
        add(m3x0_5_tapped_hole1, mode=Mode.SUBTRACT)

    # Sketch32 → M3x0.5 Tapped Hole2 (revolve, cut)
    with BuildSketch(Plane(origin=(-56.6297997, 150.625949834, 20.5), x_dir=(0, -1, 0), z_dir=(1, 0, 0))):
        Polygon((0, 0), (0, 5.351075774), (1.25, 4.6), (1.25, 0), align=None)
    m3x0_5_tapped_hole2 = revolve(axis=Axis((-56.6297997, 150.625949834, 26.85), (0, 0, -1)), mode=Mode.SUBTRACT)

    # M3x0.5 Tapped Hole2 at 2: M3x0.5 Tapped Hole2 ×2
    with Locations(*[(i * M3X0_5_TAPPED_HOLE2_AT_2_PITCH, 0, 0) for i in range(1, M3X0_5_TAPPED_HOLE2_AT_2_COUNT)]):
        add(m3x0_5_tapped_hole2, mode=Mode.SUBTRACT)


with BuildPart() as body_3_1:
    add(body_3.part)

    # M2.2x0.45 Tapped Hole2: cut by m2_2x0_45_tapped_hole2_tool, with a tolerance
    m2_2x0_45_tapped_hole2_2_stock = TopTools_ListOfShape()
    m2_2x0_45_tapped_hole2_2_stock.Append(body_3_1.part.wrapped)
    m2_2x0_45_tapped_hole2_2_tools = TopTools_ListOfShape()
    m2_2x0_45_tapped_hole2_2_tools.Append(m2_2x0_45_tapped_hole2_tool.part.wrapped)
    m2_2x0_45_tapped_hole2_2_cut = BRepAlgoAPI_Cut()
    m2_2x0_45_tapped_hole2_2_cut.SetArguments(m2_2x0_45_tapped_hole2_2_stock)
    m2_2x0_45_tapped_hole2_2_cut.SetTools(m2_2x0_45_tapped_hole2_2_tools)
    m2_2x0_45_tapped_hole2_2_cut.SetFuzzyValue(0.00001)
    m2_2x0_45_tapped_hole2_2_cut.Build()
    add(Compound.cast(m2_2x0_45_tapped_hole2_2_cut.Shape()).solids(), mode=Mode.REPLACE)


solid = Compound([body_2_1.part, part_1.part, body_3_1.part])
